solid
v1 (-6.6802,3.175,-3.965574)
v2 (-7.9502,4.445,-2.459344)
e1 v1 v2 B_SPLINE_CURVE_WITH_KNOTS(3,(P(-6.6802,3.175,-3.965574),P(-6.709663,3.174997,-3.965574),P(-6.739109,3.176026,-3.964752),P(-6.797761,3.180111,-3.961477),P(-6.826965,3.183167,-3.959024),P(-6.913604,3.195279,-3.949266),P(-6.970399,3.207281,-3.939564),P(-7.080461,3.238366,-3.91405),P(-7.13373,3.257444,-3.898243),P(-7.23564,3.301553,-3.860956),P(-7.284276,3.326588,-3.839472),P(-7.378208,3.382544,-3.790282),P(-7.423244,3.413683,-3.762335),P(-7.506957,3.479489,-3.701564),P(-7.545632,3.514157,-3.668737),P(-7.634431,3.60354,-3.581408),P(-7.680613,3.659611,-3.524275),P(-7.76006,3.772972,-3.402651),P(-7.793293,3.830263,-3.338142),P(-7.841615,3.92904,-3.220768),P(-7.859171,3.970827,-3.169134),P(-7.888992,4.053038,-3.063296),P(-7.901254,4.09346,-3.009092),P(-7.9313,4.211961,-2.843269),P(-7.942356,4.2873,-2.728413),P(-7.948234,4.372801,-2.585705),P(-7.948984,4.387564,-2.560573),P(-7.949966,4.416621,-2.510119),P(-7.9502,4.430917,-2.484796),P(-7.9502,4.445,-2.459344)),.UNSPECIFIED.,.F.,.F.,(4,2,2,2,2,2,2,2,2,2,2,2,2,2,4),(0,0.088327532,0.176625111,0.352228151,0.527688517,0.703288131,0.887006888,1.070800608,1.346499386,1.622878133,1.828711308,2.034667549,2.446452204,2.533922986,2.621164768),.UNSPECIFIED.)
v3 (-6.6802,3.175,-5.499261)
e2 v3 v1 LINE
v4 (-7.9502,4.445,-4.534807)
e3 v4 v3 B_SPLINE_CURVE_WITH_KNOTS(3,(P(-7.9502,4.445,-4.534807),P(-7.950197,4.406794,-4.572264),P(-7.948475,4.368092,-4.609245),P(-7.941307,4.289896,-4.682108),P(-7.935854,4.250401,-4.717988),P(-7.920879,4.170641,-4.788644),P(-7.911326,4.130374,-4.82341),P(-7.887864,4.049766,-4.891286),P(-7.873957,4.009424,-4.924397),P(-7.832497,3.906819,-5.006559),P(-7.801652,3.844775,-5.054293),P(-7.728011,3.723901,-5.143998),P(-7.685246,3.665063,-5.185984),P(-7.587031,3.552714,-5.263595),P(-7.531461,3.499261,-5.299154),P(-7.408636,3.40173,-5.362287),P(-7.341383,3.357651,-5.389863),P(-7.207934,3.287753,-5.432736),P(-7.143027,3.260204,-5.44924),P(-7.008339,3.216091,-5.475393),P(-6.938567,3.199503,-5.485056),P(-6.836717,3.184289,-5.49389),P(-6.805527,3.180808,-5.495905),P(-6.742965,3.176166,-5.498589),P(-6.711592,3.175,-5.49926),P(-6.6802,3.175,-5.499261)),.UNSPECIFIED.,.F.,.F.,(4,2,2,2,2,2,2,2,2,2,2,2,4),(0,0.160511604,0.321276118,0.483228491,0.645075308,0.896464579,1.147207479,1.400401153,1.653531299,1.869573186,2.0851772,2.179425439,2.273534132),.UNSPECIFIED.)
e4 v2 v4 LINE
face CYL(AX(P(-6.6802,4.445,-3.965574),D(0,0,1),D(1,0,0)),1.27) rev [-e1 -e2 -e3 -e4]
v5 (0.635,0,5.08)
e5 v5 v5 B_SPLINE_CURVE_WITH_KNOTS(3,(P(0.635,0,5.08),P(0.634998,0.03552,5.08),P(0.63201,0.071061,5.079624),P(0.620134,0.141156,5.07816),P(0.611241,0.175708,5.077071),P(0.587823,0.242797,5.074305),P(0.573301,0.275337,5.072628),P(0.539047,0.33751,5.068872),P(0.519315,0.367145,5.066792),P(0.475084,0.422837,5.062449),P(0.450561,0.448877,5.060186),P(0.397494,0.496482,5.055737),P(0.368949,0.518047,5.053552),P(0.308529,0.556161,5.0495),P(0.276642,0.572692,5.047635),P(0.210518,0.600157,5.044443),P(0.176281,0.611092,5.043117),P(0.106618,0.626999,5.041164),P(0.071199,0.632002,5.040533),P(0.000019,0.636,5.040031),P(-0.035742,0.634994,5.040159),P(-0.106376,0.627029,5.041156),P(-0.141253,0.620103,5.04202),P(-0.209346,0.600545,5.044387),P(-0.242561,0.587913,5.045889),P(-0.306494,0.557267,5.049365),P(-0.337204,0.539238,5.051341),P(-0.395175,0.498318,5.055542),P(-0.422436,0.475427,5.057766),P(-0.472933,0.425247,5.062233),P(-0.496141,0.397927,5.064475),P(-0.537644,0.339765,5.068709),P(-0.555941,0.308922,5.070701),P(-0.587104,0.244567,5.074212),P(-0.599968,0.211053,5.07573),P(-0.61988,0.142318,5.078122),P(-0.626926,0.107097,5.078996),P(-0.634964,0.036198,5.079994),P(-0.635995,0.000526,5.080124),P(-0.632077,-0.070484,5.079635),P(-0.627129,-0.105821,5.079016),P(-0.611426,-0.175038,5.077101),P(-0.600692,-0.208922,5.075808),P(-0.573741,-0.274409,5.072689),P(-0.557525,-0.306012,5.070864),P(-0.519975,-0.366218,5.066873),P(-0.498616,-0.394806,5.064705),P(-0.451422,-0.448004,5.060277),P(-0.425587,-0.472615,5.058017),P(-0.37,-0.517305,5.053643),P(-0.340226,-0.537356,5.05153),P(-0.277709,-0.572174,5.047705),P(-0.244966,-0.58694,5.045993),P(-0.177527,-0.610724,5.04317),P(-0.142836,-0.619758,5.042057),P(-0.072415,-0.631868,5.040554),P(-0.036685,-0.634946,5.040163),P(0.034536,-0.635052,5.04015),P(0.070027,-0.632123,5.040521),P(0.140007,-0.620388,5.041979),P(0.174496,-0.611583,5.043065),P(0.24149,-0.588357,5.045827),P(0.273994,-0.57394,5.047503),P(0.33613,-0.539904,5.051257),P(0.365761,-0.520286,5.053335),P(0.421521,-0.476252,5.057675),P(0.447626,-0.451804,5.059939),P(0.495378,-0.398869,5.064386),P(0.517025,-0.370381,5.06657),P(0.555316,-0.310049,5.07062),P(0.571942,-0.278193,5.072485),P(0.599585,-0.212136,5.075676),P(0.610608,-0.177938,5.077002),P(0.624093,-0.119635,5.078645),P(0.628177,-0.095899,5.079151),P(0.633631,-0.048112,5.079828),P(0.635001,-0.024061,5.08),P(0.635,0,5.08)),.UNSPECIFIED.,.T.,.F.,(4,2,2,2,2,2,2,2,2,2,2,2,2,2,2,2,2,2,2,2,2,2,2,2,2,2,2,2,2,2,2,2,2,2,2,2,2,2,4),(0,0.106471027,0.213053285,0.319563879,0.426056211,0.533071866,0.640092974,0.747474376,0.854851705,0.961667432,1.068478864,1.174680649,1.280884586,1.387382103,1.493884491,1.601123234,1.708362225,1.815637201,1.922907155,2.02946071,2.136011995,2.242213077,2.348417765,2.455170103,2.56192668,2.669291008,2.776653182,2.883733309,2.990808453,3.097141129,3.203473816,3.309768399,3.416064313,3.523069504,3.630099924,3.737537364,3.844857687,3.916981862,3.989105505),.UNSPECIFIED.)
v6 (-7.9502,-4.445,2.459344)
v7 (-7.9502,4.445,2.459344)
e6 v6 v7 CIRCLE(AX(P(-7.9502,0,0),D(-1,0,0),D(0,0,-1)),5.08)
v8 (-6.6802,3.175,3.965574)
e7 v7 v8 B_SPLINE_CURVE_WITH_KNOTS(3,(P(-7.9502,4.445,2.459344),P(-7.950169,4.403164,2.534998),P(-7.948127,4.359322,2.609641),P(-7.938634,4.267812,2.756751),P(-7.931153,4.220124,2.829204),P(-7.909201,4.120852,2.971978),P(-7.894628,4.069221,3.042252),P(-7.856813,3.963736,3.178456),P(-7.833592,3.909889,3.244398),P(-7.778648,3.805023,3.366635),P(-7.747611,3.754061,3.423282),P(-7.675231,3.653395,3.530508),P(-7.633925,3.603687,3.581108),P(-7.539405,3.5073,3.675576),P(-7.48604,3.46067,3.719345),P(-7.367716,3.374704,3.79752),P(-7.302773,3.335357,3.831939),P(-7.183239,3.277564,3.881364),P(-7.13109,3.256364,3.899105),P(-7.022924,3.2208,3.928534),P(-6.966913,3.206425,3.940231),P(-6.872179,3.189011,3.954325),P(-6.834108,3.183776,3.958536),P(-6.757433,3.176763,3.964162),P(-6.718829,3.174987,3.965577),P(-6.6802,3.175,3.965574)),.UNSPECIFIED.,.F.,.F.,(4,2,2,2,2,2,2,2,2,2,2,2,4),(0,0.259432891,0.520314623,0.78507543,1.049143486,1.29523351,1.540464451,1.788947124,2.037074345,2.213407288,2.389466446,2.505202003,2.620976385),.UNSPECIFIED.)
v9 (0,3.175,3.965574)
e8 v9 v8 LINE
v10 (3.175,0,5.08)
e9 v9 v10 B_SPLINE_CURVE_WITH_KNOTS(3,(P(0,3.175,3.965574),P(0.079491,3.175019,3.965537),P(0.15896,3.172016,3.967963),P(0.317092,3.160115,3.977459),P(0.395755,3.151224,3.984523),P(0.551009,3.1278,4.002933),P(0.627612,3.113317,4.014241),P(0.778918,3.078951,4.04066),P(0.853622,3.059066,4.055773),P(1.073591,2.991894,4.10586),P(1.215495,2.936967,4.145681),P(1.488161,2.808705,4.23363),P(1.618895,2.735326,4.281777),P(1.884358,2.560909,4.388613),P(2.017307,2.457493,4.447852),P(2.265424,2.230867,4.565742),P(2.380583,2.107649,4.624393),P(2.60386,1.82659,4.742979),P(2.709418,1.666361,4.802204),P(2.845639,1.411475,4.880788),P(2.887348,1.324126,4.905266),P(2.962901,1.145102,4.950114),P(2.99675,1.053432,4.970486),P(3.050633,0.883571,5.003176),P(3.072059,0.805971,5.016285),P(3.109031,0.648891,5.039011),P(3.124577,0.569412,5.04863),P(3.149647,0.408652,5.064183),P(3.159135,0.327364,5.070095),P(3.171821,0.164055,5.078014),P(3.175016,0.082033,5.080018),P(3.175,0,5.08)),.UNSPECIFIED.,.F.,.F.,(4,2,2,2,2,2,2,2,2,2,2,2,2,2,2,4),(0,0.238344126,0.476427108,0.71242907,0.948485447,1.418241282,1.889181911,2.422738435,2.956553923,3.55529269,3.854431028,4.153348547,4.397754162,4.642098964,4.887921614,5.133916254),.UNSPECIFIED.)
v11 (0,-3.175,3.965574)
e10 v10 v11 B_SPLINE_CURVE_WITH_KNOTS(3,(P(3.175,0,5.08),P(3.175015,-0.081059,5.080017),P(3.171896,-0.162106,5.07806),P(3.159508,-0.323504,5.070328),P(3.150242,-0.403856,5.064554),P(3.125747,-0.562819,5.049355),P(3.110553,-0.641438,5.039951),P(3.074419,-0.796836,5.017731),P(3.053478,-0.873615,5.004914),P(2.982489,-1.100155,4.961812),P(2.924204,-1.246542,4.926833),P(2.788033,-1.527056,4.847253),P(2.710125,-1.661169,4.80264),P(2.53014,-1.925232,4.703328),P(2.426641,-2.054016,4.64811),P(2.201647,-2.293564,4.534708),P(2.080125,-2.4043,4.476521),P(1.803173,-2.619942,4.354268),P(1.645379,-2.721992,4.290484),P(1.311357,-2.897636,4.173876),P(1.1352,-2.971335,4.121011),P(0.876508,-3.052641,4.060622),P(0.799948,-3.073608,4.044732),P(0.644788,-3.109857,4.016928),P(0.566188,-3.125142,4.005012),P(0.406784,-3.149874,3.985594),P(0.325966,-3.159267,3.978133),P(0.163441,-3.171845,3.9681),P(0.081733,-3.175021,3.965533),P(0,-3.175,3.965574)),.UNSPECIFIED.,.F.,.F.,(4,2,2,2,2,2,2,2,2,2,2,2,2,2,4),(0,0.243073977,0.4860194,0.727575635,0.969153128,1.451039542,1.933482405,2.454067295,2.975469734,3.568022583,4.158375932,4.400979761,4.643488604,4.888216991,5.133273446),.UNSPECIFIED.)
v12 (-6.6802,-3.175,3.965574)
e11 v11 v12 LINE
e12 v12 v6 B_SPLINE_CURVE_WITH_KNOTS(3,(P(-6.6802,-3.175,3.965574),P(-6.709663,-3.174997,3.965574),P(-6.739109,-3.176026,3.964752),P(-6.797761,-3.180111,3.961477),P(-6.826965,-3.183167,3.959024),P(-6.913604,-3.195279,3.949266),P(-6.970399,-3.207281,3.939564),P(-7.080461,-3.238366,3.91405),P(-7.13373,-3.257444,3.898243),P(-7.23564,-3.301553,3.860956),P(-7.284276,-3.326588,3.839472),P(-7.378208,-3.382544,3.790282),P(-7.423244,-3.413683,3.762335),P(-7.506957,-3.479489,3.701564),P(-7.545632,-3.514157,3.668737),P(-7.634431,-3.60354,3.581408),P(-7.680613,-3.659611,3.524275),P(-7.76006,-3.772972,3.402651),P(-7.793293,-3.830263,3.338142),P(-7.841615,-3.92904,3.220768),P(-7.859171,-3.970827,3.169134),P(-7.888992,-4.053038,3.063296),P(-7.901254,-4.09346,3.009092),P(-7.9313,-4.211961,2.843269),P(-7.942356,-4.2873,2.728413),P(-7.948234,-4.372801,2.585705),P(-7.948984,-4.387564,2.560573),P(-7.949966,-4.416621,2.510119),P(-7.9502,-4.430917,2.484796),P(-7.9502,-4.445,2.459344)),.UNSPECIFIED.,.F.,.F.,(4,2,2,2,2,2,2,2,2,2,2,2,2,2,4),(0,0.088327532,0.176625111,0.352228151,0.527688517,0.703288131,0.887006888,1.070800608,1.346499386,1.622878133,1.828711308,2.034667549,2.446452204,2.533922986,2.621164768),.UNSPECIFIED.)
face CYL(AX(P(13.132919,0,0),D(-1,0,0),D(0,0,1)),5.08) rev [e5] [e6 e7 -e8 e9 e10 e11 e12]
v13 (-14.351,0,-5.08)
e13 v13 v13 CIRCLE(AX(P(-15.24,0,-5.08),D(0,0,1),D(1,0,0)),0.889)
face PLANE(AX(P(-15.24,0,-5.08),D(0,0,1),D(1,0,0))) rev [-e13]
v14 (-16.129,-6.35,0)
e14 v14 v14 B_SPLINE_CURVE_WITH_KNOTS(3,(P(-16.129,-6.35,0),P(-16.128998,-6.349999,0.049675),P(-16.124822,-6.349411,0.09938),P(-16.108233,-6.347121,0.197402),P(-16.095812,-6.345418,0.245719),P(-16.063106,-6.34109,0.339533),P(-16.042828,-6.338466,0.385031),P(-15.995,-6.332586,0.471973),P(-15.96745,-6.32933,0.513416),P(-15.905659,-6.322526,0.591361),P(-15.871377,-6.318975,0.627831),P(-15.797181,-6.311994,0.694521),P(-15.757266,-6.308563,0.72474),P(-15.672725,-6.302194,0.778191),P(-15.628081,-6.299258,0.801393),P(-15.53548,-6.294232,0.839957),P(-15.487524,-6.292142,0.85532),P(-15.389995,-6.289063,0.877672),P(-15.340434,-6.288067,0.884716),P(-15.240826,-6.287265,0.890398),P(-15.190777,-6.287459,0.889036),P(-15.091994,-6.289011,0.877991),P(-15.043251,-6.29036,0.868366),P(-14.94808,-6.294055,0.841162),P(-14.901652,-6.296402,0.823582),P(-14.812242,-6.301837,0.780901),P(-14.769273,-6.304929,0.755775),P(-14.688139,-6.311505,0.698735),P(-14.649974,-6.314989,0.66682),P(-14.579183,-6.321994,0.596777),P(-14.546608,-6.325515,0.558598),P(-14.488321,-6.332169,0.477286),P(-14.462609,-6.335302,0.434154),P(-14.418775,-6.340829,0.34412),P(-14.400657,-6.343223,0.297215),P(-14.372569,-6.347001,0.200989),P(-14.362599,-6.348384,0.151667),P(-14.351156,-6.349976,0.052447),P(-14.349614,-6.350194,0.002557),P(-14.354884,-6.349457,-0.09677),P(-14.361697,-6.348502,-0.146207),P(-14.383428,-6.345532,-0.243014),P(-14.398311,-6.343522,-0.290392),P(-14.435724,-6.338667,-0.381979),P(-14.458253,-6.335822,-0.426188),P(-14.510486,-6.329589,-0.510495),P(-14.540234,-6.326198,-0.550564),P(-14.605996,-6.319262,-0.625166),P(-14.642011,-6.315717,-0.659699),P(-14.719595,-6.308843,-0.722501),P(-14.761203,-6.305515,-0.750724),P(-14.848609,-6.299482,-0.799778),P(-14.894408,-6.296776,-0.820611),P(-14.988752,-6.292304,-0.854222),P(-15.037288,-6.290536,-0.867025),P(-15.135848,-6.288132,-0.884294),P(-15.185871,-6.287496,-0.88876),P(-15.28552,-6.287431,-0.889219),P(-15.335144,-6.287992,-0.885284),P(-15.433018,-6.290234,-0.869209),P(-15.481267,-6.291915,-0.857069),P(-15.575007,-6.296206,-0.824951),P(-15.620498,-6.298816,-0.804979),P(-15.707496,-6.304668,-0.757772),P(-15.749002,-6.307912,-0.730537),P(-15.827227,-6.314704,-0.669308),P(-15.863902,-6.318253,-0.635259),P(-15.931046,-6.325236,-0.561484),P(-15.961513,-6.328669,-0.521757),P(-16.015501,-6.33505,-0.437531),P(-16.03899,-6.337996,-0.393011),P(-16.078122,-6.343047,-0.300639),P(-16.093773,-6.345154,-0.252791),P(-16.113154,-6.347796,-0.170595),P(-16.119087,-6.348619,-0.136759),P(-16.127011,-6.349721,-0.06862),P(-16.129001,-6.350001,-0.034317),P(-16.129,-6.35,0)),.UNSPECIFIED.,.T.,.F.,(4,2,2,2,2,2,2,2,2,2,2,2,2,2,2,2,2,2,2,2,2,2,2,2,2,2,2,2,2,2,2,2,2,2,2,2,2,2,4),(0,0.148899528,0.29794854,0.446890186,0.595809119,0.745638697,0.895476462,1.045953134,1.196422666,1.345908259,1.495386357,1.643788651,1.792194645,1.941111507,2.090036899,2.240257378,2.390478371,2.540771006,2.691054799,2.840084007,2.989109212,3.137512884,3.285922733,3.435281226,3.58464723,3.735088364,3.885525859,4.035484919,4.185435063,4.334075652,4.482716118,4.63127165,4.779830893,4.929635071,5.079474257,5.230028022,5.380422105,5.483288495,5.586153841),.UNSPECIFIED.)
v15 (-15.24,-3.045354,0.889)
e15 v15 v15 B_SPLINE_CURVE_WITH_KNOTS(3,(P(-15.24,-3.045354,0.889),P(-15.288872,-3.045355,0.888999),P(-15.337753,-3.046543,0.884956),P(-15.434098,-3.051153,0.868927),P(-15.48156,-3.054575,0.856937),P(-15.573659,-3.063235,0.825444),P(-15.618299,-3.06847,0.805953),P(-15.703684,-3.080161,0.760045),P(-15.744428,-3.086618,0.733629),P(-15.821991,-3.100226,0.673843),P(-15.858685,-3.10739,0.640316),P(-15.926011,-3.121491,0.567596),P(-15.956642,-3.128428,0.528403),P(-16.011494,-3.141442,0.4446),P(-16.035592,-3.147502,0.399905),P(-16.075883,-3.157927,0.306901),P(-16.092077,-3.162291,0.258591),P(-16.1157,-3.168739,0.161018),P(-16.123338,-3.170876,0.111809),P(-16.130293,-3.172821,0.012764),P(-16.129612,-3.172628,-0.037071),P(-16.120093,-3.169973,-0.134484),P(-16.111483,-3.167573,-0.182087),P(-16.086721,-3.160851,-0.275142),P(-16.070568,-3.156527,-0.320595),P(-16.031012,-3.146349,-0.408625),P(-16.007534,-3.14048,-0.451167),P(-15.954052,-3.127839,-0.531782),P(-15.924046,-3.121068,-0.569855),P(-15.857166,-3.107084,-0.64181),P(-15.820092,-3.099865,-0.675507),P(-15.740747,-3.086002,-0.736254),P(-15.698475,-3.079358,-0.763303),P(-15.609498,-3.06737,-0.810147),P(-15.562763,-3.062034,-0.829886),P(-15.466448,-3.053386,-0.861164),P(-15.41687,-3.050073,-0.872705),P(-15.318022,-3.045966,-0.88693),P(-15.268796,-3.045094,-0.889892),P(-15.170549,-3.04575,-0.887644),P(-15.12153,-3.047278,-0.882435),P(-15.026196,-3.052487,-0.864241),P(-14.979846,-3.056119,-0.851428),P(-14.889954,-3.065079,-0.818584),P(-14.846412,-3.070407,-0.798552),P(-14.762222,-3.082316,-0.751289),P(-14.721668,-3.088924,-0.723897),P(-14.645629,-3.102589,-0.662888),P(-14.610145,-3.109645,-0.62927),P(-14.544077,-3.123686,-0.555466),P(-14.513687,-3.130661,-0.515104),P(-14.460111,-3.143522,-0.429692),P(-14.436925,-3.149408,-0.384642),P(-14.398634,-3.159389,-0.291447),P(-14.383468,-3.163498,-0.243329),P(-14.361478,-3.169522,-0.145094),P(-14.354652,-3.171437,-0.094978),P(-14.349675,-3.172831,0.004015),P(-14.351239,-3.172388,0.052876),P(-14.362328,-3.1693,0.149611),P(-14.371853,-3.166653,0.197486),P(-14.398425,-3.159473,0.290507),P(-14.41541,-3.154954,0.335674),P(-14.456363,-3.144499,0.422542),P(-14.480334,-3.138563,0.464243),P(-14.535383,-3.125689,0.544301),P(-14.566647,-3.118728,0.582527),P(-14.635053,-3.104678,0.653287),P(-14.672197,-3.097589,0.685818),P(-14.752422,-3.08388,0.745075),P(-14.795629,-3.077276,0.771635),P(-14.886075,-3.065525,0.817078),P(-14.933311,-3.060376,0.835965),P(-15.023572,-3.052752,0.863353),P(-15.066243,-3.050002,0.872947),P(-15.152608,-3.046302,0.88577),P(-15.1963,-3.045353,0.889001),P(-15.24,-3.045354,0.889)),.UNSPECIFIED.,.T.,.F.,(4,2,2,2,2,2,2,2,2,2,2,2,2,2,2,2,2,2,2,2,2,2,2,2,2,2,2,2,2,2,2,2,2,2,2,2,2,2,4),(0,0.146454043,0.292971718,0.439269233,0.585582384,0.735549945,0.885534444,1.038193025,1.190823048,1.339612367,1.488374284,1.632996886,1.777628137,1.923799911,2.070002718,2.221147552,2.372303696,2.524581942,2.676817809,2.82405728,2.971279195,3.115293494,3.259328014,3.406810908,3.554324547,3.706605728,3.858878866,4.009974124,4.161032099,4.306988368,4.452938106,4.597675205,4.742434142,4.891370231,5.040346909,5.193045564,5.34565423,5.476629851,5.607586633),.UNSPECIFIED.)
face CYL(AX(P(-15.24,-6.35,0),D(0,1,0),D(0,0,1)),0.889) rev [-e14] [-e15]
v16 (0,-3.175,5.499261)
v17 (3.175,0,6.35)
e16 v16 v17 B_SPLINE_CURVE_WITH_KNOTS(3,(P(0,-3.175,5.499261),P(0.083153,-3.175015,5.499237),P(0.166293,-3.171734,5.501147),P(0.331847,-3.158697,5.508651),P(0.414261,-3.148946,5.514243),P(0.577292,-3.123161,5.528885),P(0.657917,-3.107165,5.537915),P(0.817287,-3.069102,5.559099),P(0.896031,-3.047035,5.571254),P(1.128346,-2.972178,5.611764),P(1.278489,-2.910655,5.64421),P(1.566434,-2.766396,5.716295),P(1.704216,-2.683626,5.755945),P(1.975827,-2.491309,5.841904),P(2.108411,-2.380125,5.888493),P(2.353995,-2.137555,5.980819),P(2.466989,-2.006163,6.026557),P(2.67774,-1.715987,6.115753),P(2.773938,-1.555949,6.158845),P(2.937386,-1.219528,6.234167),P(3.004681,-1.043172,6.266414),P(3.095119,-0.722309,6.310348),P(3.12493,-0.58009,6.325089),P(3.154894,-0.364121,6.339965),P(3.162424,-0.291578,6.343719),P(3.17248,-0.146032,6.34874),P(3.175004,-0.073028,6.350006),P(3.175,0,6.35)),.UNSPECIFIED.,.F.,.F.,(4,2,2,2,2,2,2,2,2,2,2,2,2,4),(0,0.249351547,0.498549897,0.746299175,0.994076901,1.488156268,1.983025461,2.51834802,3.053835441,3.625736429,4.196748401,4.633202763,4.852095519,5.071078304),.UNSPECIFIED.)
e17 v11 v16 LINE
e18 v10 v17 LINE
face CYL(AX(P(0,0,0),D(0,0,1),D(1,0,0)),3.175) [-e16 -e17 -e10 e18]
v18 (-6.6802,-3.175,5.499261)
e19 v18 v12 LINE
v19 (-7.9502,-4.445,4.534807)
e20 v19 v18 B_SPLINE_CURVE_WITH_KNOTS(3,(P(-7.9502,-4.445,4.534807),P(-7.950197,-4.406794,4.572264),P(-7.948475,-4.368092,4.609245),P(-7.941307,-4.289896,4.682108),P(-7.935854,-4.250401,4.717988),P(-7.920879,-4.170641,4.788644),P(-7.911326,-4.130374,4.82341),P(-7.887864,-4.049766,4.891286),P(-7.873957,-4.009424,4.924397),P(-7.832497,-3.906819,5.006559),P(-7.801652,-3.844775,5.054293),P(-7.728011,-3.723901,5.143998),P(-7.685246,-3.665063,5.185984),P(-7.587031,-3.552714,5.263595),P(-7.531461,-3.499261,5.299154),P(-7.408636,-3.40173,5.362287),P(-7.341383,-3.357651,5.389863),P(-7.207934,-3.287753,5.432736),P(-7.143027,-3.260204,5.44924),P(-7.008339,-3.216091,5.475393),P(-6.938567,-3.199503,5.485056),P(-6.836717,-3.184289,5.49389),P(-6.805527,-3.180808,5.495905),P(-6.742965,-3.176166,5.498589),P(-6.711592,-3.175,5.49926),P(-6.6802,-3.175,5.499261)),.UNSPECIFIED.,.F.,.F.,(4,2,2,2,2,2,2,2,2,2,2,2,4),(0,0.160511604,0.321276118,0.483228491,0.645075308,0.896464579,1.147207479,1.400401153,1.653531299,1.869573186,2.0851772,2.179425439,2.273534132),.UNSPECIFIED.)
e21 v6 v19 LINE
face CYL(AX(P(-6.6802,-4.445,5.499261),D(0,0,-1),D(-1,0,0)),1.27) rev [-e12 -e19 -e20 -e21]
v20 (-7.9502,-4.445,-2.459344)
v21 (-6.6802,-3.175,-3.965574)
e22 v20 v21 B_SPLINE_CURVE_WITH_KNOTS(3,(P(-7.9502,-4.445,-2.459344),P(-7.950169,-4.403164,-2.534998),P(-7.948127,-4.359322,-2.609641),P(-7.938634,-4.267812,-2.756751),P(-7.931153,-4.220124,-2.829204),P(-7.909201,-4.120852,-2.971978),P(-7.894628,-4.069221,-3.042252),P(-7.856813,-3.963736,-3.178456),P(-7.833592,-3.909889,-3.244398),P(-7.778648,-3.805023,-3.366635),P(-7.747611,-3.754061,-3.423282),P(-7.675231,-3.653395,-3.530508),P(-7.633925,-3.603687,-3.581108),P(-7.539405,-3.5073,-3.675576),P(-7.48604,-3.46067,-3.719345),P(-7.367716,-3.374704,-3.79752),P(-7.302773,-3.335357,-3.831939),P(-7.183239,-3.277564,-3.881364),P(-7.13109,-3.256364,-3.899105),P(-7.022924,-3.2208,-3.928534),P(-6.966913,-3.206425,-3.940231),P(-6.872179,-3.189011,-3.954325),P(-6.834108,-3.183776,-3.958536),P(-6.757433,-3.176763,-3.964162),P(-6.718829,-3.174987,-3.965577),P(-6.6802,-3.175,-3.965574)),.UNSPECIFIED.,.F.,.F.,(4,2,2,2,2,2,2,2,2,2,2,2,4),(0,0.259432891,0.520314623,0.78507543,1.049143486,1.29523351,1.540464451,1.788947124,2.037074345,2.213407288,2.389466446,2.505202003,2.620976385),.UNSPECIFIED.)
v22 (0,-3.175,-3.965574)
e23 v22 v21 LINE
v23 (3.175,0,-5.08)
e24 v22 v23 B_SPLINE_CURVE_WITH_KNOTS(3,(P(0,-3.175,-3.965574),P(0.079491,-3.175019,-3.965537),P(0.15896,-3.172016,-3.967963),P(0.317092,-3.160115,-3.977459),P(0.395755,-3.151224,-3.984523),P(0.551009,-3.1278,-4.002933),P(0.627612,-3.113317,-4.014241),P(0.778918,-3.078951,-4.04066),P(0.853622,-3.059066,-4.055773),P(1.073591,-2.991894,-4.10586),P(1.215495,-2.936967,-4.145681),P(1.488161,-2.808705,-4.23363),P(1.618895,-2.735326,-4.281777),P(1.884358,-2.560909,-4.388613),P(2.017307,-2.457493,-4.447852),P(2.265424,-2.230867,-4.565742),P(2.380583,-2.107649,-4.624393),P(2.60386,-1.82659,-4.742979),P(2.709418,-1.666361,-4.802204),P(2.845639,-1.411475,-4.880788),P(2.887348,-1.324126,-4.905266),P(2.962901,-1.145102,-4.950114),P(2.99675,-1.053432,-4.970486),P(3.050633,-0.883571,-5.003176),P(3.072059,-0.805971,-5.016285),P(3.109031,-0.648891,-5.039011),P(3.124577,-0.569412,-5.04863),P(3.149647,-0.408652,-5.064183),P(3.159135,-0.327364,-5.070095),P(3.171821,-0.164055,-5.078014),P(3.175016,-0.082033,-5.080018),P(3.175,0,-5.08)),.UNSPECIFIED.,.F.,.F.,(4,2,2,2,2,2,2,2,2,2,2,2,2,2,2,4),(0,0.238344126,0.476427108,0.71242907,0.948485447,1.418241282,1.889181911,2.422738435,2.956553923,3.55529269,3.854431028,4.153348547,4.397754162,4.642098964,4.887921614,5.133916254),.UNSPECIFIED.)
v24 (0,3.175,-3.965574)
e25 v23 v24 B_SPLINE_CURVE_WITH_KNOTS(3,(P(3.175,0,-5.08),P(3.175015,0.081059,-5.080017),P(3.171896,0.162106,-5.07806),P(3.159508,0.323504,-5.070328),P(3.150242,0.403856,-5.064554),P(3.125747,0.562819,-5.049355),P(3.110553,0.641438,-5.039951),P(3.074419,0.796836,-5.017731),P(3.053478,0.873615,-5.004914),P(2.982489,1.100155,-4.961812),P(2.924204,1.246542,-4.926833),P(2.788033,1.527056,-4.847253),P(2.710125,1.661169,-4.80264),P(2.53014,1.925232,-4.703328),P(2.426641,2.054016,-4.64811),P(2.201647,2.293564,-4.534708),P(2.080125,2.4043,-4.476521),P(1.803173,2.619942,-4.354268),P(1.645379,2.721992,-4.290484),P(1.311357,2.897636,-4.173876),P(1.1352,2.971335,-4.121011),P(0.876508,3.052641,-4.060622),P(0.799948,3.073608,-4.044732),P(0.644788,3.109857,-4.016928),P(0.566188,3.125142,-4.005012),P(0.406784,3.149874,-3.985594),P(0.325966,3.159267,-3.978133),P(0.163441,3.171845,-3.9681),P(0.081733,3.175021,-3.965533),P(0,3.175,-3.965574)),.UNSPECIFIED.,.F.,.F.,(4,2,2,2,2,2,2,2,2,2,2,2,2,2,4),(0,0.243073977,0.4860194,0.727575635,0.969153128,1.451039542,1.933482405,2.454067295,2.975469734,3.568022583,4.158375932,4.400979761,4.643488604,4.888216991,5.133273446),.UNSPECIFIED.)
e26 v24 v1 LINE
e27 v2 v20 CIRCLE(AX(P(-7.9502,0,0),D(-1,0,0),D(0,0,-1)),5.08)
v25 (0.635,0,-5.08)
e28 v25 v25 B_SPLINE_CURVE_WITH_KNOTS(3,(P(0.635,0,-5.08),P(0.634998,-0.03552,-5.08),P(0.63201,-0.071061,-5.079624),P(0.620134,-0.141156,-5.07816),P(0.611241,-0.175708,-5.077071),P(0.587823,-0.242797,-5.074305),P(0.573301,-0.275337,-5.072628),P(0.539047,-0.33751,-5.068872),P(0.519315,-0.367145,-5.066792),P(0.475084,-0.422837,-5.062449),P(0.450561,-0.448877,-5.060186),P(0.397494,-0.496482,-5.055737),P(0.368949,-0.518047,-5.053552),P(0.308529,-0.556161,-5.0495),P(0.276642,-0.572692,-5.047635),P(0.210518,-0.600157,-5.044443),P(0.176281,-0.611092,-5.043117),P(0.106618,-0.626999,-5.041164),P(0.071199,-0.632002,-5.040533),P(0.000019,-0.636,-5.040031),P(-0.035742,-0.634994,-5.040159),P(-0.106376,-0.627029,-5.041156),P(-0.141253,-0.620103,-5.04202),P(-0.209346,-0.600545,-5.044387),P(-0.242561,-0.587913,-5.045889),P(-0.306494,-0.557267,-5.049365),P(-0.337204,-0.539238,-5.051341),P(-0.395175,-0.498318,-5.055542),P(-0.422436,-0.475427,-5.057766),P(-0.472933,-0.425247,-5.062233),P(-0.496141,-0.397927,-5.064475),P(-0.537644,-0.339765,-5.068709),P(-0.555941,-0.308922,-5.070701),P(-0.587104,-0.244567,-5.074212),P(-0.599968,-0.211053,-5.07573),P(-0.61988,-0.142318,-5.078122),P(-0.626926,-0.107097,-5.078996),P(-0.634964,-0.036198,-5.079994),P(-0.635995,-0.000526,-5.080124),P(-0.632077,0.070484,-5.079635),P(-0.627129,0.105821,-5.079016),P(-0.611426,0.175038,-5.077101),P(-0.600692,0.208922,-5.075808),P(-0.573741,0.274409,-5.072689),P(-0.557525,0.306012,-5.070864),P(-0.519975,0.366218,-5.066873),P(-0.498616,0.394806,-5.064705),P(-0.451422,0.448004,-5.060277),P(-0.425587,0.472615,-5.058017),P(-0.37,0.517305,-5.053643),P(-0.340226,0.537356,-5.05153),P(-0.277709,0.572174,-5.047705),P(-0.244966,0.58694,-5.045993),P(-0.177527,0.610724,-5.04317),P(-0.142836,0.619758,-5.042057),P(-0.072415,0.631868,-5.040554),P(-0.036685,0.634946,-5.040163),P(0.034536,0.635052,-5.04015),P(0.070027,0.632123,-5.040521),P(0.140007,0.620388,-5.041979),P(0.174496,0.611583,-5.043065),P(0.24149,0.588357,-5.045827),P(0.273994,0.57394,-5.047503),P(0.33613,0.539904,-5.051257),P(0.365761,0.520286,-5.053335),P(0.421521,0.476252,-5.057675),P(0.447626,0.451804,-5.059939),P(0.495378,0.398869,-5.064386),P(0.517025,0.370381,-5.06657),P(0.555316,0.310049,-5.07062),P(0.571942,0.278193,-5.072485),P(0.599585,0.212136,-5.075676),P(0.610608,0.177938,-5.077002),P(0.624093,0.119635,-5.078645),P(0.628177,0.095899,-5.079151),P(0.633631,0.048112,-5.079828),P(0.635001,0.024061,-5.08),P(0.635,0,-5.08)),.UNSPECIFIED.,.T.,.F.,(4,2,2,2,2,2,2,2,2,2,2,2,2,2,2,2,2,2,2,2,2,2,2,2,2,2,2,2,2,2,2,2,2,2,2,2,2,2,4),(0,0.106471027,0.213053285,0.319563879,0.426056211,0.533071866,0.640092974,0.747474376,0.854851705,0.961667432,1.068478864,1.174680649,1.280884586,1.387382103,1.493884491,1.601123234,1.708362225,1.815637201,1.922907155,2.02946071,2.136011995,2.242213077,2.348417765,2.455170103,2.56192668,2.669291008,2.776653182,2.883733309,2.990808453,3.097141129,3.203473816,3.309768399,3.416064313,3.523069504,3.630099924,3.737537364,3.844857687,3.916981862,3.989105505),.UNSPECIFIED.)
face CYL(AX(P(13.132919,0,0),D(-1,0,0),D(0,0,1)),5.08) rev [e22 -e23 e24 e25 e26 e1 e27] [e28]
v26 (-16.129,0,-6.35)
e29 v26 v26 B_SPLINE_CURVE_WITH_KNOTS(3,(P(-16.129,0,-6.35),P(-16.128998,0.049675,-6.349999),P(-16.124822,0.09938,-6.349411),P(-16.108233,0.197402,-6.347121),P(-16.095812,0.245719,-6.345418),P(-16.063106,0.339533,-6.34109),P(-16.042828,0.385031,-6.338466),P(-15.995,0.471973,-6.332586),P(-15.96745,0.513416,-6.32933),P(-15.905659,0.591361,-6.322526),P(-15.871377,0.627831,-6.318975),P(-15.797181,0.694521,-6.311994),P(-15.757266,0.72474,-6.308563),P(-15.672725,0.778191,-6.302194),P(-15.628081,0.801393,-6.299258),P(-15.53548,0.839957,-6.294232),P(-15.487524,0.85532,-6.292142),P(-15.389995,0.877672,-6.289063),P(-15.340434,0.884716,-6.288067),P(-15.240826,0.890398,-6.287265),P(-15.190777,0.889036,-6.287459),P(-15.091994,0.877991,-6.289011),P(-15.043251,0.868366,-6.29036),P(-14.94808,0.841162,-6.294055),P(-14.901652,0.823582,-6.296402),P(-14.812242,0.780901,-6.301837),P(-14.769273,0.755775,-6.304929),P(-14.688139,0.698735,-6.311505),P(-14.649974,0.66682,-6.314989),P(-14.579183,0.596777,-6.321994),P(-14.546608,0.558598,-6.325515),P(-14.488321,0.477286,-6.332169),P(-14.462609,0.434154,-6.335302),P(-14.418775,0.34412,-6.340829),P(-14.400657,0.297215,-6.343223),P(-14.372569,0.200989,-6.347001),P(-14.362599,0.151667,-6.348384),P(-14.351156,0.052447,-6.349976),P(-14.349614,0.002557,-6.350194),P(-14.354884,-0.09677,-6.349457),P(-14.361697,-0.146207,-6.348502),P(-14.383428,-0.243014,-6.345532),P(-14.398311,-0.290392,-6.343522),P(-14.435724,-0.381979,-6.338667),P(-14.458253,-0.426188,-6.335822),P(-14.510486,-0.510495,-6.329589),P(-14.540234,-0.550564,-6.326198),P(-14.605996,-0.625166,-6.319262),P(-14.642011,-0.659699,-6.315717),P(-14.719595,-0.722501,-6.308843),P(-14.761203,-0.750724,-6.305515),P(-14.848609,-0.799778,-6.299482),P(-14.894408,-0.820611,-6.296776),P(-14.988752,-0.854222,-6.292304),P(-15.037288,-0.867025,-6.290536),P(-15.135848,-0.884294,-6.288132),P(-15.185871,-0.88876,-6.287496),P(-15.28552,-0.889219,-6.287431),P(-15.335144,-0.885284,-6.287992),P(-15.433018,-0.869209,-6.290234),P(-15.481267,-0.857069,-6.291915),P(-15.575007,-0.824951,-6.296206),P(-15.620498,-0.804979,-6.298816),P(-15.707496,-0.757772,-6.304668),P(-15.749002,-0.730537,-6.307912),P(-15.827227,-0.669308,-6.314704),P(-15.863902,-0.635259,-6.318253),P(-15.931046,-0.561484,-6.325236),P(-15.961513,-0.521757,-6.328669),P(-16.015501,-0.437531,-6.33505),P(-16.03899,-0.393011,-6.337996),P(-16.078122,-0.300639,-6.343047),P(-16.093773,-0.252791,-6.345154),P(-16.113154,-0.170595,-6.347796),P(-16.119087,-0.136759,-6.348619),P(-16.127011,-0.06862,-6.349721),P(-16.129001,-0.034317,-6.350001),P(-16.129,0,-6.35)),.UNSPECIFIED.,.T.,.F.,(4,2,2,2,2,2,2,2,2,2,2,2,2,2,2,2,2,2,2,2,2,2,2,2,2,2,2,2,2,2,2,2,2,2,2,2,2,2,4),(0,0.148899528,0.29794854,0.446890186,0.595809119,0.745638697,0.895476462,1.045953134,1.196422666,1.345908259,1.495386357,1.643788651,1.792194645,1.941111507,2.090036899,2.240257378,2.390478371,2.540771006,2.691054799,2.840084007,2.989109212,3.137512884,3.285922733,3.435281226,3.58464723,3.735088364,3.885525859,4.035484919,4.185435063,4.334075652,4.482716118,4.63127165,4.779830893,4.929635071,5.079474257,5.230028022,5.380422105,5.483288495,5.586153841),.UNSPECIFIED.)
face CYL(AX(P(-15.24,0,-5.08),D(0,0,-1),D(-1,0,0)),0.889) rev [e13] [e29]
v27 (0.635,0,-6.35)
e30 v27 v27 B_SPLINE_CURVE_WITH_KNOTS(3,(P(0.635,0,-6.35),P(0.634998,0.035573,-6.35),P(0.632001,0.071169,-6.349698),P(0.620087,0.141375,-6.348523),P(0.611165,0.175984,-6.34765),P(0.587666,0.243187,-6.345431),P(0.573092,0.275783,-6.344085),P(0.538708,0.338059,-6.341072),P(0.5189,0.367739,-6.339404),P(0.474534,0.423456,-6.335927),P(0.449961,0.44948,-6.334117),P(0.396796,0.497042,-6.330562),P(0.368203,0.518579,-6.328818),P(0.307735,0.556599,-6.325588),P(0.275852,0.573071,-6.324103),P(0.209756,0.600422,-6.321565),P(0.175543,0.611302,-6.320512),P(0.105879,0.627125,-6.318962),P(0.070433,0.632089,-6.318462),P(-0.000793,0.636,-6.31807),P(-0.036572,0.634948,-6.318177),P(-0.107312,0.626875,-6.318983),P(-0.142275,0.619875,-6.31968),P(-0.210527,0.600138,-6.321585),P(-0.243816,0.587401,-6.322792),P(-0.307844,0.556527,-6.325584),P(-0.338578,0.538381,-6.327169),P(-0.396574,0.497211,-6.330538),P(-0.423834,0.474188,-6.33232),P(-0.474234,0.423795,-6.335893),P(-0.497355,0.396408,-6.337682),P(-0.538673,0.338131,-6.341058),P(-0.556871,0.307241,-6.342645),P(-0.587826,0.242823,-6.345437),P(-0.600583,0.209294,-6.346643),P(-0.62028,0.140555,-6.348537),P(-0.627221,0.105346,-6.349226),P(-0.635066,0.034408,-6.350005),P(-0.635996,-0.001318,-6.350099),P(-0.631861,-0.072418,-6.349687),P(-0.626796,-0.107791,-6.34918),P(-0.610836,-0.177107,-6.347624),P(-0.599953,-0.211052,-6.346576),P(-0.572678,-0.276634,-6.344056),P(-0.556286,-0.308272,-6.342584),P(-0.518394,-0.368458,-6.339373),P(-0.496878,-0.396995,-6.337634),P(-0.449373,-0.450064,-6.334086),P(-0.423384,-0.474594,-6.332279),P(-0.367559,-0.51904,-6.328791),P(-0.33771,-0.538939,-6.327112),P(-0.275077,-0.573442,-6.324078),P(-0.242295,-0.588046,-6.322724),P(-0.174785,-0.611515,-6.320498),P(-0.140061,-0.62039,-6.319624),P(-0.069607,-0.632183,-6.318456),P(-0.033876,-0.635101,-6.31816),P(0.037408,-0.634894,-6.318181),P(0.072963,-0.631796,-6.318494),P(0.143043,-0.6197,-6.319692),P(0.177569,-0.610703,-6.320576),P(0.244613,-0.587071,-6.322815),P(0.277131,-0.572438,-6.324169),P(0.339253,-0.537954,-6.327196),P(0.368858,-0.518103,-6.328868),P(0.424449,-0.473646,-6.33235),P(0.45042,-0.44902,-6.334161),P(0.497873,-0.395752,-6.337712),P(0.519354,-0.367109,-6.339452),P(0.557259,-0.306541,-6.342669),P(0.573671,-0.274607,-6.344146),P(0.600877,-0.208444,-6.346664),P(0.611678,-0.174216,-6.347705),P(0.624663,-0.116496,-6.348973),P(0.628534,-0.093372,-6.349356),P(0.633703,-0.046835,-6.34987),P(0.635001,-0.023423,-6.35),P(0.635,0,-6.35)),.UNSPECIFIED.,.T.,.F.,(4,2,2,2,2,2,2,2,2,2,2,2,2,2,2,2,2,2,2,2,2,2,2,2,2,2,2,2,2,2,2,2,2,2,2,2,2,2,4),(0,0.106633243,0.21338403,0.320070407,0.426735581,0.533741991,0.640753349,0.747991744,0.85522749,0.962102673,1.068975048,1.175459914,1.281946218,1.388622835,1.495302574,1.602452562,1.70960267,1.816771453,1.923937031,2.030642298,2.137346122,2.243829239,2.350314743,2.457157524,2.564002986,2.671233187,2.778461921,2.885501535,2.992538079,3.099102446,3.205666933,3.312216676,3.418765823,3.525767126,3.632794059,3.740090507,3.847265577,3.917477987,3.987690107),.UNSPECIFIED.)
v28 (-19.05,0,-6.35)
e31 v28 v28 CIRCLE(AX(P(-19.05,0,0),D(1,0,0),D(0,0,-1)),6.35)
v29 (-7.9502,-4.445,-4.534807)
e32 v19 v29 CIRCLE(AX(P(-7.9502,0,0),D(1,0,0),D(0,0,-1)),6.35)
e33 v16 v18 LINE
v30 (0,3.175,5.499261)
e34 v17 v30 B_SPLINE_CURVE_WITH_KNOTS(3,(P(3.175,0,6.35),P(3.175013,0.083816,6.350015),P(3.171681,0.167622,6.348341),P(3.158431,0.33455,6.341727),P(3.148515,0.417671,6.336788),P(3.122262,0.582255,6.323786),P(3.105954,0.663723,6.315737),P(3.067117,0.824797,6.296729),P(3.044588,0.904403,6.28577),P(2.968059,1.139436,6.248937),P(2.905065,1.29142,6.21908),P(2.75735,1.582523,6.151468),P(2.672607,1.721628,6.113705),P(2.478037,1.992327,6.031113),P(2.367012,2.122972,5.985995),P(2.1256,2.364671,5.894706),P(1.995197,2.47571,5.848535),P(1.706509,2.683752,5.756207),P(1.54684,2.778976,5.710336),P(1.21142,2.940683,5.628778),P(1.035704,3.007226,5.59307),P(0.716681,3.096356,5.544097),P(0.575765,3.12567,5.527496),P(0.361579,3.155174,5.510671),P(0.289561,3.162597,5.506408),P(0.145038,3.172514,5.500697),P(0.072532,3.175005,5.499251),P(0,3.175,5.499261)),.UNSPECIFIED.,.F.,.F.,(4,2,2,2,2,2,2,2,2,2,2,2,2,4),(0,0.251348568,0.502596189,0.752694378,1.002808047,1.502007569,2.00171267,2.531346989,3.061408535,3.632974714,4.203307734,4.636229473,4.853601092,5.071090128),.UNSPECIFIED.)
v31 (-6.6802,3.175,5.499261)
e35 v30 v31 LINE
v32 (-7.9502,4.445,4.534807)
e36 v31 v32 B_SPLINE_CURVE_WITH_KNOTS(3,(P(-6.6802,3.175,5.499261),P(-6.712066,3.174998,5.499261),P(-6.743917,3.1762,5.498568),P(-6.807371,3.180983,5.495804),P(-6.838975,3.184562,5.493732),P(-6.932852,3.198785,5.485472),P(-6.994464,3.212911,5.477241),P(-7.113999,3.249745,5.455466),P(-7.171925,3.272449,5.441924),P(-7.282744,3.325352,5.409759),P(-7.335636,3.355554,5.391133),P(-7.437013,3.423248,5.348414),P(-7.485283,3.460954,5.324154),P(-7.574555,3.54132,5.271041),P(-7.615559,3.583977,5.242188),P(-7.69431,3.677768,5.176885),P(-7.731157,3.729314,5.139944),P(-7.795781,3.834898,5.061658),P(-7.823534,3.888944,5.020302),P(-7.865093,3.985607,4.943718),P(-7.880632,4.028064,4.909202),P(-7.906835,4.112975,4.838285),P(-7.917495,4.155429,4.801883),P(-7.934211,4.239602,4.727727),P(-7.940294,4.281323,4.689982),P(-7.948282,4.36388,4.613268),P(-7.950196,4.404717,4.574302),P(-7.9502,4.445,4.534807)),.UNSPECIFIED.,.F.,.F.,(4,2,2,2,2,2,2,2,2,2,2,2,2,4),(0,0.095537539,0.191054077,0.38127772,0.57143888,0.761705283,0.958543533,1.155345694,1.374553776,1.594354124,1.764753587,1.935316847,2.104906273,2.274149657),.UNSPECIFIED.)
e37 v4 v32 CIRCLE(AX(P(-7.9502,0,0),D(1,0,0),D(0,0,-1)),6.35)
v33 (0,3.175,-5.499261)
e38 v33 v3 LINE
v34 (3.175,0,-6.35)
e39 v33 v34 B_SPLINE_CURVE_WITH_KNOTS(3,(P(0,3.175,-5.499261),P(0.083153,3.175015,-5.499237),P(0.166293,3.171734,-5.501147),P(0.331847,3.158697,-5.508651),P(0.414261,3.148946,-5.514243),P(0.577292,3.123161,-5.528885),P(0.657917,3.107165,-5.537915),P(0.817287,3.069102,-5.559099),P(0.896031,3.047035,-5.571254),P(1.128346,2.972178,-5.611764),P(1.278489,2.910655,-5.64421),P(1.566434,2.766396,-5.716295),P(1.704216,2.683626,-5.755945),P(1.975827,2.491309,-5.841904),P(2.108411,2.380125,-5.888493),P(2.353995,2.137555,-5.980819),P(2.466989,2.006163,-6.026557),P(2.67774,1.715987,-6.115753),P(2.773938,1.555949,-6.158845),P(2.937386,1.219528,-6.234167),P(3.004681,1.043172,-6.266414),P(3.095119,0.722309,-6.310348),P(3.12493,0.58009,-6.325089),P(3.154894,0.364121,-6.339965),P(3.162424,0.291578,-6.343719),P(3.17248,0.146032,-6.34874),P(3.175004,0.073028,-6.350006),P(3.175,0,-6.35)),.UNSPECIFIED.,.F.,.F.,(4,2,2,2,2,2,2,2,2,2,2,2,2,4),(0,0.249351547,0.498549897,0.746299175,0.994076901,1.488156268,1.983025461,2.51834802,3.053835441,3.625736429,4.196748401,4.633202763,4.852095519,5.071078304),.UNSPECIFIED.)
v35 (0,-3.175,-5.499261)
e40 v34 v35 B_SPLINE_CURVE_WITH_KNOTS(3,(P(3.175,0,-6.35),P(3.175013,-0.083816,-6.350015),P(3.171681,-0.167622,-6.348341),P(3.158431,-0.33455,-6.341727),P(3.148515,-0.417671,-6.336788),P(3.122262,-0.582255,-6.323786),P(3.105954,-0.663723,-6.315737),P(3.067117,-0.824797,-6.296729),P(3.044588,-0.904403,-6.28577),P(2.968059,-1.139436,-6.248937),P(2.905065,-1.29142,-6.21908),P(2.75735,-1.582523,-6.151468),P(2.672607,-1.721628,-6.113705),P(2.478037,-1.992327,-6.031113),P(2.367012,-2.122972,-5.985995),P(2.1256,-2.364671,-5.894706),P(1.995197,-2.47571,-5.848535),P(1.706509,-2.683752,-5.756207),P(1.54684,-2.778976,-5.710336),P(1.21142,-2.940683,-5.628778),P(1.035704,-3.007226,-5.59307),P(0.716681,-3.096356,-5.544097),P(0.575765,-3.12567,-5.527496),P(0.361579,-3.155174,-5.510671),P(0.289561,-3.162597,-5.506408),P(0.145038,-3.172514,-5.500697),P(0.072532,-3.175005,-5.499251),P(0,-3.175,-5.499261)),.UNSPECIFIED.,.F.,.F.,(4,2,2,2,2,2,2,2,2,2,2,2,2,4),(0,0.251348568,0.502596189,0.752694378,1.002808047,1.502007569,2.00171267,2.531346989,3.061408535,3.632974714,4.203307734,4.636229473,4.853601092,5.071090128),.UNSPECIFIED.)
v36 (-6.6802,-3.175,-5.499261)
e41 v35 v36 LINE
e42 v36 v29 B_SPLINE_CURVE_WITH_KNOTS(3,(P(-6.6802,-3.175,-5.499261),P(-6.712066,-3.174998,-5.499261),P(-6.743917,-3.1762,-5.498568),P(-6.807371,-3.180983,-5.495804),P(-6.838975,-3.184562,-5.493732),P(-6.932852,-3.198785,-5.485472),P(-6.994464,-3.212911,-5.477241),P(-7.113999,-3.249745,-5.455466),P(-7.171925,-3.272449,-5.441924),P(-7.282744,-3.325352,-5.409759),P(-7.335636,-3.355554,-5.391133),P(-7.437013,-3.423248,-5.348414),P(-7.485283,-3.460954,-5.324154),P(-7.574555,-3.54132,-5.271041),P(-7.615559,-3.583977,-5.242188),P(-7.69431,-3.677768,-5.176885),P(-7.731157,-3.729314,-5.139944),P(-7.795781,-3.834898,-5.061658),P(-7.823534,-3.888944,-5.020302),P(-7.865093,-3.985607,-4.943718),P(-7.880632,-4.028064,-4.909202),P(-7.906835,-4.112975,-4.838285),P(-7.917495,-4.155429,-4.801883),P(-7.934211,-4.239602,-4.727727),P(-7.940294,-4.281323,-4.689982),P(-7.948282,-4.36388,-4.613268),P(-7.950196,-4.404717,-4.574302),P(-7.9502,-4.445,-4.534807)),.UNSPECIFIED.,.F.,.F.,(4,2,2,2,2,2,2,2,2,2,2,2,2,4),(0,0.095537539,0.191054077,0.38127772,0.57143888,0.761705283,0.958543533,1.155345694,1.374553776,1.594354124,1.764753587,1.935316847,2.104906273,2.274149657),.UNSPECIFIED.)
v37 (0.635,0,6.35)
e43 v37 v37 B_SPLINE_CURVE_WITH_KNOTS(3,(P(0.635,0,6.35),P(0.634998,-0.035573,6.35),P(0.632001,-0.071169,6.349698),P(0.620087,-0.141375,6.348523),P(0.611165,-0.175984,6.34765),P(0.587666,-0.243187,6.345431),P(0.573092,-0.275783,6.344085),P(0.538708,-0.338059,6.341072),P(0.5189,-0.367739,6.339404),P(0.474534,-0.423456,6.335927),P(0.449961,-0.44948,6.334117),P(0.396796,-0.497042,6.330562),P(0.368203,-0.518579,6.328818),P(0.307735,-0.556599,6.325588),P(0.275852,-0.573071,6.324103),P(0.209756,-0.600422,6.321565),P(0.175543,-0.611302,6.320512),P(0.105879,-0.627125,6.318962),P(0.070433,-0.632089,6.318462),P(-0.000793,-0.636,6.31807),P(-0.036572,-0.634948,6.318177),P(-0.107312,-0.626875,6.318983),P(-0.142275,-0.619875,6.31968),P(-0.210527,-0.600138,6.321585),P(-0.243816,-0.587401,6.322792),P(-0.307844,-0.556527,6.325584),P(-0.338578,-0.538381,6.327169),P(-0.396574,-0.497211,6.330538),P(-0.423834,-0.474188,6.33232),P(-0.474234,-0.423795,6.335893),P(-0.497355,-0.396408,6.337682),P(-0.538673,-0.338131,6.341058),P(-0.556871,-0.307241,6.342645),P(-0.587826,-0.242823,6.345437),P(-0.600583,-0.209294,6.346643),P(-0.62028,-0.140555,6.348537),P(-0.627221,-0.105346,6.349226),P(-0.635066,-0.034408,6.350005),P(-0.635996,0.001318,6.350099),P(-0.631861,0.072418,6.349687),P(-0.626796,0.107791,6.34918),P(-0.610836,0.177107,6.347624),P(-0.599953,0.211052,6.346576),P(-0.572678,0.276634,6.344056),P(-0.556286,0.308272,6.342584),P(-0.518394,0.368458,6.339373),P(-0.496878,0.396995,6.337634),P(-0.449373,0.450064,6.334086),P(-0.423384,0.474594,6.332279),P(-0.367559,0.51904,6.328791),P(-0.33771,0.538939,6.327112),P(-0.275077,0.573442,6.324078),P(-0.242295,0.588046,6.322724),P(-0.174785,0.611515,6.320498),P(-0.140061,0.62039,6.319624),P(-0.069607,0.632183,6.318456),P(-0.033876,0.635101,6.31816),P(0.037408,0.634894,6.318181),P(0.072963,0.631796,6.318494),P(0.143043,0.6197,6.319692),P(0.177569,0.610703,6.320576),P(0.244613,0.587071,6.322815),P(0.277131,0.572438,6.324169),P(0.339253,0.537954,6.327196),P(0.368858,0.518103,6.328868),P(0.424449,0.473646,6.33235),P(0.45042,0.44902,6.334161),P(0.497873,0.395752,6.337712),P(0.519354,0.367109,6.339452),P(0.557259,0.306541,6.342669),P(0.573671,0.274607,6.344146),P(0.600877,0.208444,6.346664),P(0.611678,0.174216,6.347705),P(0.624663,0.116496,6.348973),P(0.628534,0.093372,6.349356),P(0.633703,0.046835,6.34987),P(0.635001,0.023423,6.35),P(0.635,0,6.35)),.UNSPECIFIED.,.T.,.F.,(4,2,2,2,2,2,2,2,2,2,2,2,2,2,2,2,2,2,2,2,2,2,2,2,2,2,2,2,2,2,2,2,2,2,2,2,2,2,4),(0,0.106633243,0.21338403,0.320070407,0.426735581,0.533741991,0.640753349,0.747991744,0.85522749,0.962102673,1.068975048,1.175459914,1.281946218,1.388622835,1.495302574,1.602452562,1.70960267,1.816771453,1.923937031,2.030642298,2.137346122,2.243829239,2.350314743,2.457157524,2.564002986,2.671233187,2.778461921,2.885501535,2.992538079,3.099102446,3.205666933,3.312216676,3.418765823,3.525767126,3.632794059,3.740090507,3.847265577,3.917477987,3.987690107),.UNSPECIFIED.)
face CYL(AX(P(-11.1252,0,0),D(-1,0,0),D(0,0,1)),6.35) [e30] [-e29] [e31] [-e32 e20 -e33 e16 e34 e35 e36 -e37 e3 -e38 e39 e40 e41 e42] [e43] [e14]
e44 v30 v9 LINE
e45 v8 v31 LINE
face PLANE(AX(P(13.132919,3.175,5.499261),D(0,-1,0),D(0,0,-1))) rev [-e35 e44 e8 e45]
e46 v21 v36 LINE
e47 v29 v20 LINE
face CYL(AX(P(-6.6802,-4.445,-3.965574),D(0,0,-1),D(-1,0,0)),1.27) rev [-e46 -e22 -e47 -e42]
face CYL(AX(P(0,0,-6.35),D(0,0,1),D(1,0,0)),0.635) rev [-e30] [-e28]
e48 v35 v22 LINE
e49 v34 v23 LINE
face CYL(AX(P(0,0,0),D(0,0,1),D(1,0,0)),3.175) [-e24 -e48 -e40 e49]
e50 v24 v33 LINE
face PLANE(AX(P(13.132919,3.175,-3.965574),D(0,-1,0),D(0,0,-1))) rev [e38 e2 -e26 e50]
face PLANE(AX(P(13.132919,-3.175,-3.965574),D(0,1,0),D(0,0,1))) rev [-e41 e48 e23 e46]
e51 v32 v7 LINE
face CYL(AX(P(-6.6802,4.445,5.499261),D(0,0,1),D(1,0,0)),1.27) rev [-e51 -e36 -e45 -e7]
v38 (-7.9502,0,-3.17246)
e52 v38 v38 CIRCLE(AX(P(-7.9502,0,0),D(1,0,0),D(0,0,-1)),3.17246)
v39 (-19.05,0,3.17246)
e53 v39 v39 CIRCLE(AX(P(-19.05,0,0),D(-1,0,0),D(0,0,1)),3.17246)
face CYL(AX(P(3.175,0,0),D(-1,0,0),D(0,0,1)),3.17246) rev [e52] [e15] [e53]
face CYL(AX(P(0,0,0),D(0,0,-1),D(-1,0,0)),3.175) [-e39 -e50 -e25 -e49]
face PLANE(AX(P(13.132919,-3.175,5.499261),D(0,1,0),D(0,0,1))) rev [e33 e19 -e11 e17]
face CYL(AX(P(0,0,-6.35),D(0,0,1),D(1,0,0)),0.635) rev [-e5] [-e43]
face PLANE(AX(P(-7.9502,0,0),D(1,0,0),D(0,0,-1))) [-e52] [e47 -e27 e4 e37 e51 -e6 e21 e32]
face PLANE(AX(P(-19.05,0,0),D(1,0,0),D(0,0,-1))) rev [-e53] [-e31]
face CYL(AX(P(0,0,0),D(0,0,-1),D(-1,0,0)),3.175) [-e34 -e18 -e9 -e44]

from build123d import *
from build123d.topology import SkipClean

# Parameters (mm, degrees)
SKETCH1_R                   = 6.35
FLANGE_BOTTOM_DEPTH         = 7.9248
SKETCH2_R                   = 6.35
FLANGMIDBODY_DEPTH          = 3.175
FLANGELEGS_DEPTH            = 11.1252
FILLET1_R                   = 3.175
LOCKINGSHAFTHOLE_DEPTH      = 22.060567449
LOCKINGSHAFTHOLE_DEPTH_BACK = 22.060567449
SKETCH4_R                   = 0.635
FILLET3_R                   = 1.27
SKETCH5_R                   = 3.17246
CENTERSHAFTHOLE_DEPTH       = 24.970724451
SKETCH10_R                  = 0.889
SET_SCREW_DEPTH             = 22.060567449
SKETCH11_R                  = 0.889
SUB_DRILL_DEPTH             = 1.27


# Some blends are built 0.0001 mm under size
with BuildPart() as part:
    # Sketch1 → Flange Bottom (new body)
    with BuildSketch(Plane(origin=(-19.05, 0, 0), x_dir=(0, 0, -1), z_dir=(1, 0, 0))):
        Circle(SKETCH1_R)
    extrude(amount=FLANGE_BOTTOM_DEPTH)

    # Sketch2 → Flangmidbody (add)
    with BuildSketch(Plane(origin=(-11.1252, 0, 0), x_dir=(0, 0, -1), z_dir=(1, 0, 0))):
        Circle(SKETCH2_R)
    extrude(amount=FLANGMIDBODY_DEPTH)

    # Sketch3 → Flangelegs (add)
    with SkipClean():  # the faces are left unmerged after this step: merging them gives an invalid solid
        with BuildSketch(Plane(origin=(-7.9502, 0, 0), x_dir=(0, 0, -1), z_dir=(1, 0, 0))):
            with BuildLine():
                Line((-5.499261314, 3.175), (-3.965573729, 3.175))
                ThreePointArc((-3.965573729, 3.175), (-5.08, 0), (-3.965573729, -3.175))
                Line((-3.965573729, -3.175), (-5.499261314, -3.175))
                ThreePointArc((-5.499261314, -3.175), (-6.35, 0), (-5.499261314, 3.175))
            make_face()
            with BuildLine():
                Line((3.965573729, 3.175), (5.499261314, 3.175))
                ThreePointArc((5.499261314, 3.175), (6.35, 0), (5.499261314, -3.175))
                Line((5.499261314, -3.175), (3.965573729, -3.175))
                ThreePointArc((3.965573729, -3.175), (5.08, 0), (3.965573729, 3.175))
            make_face()
        extrude(amount=FLANGELEGS_DEPTH)

    # Fillet1
    fillet1_edges = [part.edges().sort_by_distance(p)[0] for p in [
        (3.175, -3.175, -4.732417522),
        (3.175, 3.175, -4.732417522),
        (3.175, -3.175, 4.732417522),
        (3.175, 3.175, 4.732417522),
    ]]
    fillet(fillet1_edges, radius=FILLET1_R - 0.0001)  # a hair under: the kernel refuses the full size

    # Sketch4 → Lockingshafthole (cut, two sides: drawn at the far end of the back side and taken through both)
    with BuildSketch(Plane.XY.offset(-LOCKINGSHAFTHOLE_DEPTH_BACK)):
        Circle(SKETCH4_R)
    extrude(amount=LOCKINGSHAFTHOLE_DEPTH + LOCKINGSHAFTHOLE_DEPTH_BACK, mode=Mode.SUBTRACT)

    # Fillet3
    # the kernel refuses this fillet: 1.27 mm, written as the material it adds along each edge
    with BuildSketch(Plane(origin=(-7.9502, 3.175, -0.790573729), x_dir=(1, 0, 0), z_dir=(0, 0, -1))) as fillet3_piece_1_section:
        with BuildLine():
            CenterArc((FILLET3_R, -FILLET3_R), FILLET3_R, 90, 90)
            Line((0, -FILLET3_R), (0, 0))
            Line((0, 0), (FILLET3_R, 0))
        make_face()
    fillet3_piece_1 = extrude(amount=7.883687585, mode=Mode.PRIVATE)
    fillet3_piece_1 = fillet3_piece_1 & Plane(origin=(-7.671308244, 0, 0), x_dir=(0, 0.4999999999999997, -0.8660254037844388), z_dir=(-1, 0, 0)) * Cylinder(6.35, 21, mode=Mode.PRIVATE)
    fillet3_piece_1 = fillet3_piece_1 - Plane(origin=(-7.671308244, 0, 0), x_dir=(0, -0.6249999999999998, -0.7806247497997999), z_dir=(-1, 0, 0)) * Cylinder(5.08, 21, mode=Mode.PRIVATE)
    add(fillet3_piece_1)
    with BuildSketch(Plane(origin=(-7.9502, -3.175, -8.674261314), x_dir=(1, 0, 0), z_dir=(0, 0, 1))) as fillet3_piece_2_section:
        with BuildLine():
            CenterArc((FILLET3_R, -FILLET3_R), FILLET3_R, 90, 90)
            Line((0, -FILLET3_R), (0, 0))
            Line((0, 0), (FILLET3_R, 0))
        make_face()
    fillet3_piece_2 = extrude(amount=7.883687585, mode=Mode.PRIVATE)
    fillet3_piece_2 = fillet3_piece_2 & Plane(origin=(-7.671308757, 0, 0), x_dir=(0, 0.4999999999999997, -0.8660254037844388), z_dir=(-1, 0, 0)) * Cylinder(6.35, 21, mode=Mode.PRIVATE)
    fillet3_piece_2 = fillet3_piece_2 - Plane(origin=(-7.671308757, 0, 0), x_dir=(0, -0.6249999999999998, -0.7806247497997999), z_dir=(-1, 0, 0)) * Cylinder(5.08, 21, mode=Mode.PRIVATE)
    add(fillet3_piece_2)
    with BuildSketch(Plane(origin=(-7.9502, -3.175, 0.790573729), x_dir=(0, -1, 0), z_dir=(0, 0, 1))) as fillet3_piece_3_section:
        with BuildLine():
            CenterArc((FILLET3_R, FILLET3_R), FILLET3_R, 180, 90)
            Line((0, FILLET3_R), (0, 0))
            Line((0, 0), (FILLET3_R, 0))
        make_face()
    fillet3_piece_3 = extrude(amount=7.883687585, mode=Mode.PRIVATE)
    fillet3_piece_3 = fillet3_piece_3 & Plane(origin=(-7.671308363, 0, 0), x_dir=(0, 0, -1), z_dir=(-1, 0, 0)) * Cylinder(6.35, 21, mode=Mode.PRIVATE)
    fillet3_piece_3 = fillet3_piece_3 - Plane(origin=(-7.671308363, 0, 0), x_dir=(0, 0.6250000000000004, 0.7806247497997995), z_dir=(-1, 0, 0)) * Cylinder(5.08, 21, mode=Mode.PRIVATE)
    add(fillet3_piece_3)
    with BuildSketch(Plane(origin=(-7.9502, 3.175, 8.674261314), x_dir=(0, 1, 0), z_dir=(0, 0, -1))) as fillet3_piece_4_section:
        with BuildLine():
            CenterArc((FILLET3_R, FILLET3_R), FILLET3_R, 180, 90)
            Line((0, FILLET3_R), (0, 0))
            Line((0, 0), (FILLET3_R, 0))
        make_face()
    fillet3_piece_4 = extrude(amount=7.883687585, mode=Mode.PRIVATE)
    fillet3_piece_4 = fillet3_piece_4 & Plane(origin=(-7.671308731, 0, 0), x_dir=(0, 0, -1), z_dir=(-1, 0, 0)) * Cylinder(6.35, 21, mode=Mode.PRIVATE)
    fillet3_piece_4 = fillet3_piece_4 - Plane(origin=(-7.671308731, 0, 0), x_dir=(0, 0.6250000000000004, 0.7806247497997995), z_dir=(-1, 0, 0)) * Cylinder(5.08, 21, mode=Mode.PRIVATE)
    add(fillet3_piece_4)

    # Sketch5 → CenterShaftHole (cut, through all)
    with BuildSketch(Plane.ZY.offset(19.05)):
        Circle(SKETCH5_R)
    extrude(amount=-CENTERSHAFTHOLE_DEPTH, mode=Mode.SUBTRACT)

    # Sketch10 → SET SCREW (cut, through all)
    with BuildSketch(Plane(origin=(0, 0, 0), x_dir=(1, 0, 0), z_dir=(0, 1, 0))):
        with Locations(Location((-15.24, 0, 0), (0, 0, 270))):
            Circle(SKETCH10_R)
    extrude(amount=-SET_SCREW_DEPTH, mode=Mode.SUBTRACT)

    # Sketch11 → SUB DRILL (cut)
    with BuildSketch(Plane.XY.offset(-6.35)):
        with Locations((-15.24, 0)):
            Circle(SKETCH11_R)
    extrude(amount=SUB_DRILL_DEPTH, mode=Mode.SUBTRACT)


solid = part.part
